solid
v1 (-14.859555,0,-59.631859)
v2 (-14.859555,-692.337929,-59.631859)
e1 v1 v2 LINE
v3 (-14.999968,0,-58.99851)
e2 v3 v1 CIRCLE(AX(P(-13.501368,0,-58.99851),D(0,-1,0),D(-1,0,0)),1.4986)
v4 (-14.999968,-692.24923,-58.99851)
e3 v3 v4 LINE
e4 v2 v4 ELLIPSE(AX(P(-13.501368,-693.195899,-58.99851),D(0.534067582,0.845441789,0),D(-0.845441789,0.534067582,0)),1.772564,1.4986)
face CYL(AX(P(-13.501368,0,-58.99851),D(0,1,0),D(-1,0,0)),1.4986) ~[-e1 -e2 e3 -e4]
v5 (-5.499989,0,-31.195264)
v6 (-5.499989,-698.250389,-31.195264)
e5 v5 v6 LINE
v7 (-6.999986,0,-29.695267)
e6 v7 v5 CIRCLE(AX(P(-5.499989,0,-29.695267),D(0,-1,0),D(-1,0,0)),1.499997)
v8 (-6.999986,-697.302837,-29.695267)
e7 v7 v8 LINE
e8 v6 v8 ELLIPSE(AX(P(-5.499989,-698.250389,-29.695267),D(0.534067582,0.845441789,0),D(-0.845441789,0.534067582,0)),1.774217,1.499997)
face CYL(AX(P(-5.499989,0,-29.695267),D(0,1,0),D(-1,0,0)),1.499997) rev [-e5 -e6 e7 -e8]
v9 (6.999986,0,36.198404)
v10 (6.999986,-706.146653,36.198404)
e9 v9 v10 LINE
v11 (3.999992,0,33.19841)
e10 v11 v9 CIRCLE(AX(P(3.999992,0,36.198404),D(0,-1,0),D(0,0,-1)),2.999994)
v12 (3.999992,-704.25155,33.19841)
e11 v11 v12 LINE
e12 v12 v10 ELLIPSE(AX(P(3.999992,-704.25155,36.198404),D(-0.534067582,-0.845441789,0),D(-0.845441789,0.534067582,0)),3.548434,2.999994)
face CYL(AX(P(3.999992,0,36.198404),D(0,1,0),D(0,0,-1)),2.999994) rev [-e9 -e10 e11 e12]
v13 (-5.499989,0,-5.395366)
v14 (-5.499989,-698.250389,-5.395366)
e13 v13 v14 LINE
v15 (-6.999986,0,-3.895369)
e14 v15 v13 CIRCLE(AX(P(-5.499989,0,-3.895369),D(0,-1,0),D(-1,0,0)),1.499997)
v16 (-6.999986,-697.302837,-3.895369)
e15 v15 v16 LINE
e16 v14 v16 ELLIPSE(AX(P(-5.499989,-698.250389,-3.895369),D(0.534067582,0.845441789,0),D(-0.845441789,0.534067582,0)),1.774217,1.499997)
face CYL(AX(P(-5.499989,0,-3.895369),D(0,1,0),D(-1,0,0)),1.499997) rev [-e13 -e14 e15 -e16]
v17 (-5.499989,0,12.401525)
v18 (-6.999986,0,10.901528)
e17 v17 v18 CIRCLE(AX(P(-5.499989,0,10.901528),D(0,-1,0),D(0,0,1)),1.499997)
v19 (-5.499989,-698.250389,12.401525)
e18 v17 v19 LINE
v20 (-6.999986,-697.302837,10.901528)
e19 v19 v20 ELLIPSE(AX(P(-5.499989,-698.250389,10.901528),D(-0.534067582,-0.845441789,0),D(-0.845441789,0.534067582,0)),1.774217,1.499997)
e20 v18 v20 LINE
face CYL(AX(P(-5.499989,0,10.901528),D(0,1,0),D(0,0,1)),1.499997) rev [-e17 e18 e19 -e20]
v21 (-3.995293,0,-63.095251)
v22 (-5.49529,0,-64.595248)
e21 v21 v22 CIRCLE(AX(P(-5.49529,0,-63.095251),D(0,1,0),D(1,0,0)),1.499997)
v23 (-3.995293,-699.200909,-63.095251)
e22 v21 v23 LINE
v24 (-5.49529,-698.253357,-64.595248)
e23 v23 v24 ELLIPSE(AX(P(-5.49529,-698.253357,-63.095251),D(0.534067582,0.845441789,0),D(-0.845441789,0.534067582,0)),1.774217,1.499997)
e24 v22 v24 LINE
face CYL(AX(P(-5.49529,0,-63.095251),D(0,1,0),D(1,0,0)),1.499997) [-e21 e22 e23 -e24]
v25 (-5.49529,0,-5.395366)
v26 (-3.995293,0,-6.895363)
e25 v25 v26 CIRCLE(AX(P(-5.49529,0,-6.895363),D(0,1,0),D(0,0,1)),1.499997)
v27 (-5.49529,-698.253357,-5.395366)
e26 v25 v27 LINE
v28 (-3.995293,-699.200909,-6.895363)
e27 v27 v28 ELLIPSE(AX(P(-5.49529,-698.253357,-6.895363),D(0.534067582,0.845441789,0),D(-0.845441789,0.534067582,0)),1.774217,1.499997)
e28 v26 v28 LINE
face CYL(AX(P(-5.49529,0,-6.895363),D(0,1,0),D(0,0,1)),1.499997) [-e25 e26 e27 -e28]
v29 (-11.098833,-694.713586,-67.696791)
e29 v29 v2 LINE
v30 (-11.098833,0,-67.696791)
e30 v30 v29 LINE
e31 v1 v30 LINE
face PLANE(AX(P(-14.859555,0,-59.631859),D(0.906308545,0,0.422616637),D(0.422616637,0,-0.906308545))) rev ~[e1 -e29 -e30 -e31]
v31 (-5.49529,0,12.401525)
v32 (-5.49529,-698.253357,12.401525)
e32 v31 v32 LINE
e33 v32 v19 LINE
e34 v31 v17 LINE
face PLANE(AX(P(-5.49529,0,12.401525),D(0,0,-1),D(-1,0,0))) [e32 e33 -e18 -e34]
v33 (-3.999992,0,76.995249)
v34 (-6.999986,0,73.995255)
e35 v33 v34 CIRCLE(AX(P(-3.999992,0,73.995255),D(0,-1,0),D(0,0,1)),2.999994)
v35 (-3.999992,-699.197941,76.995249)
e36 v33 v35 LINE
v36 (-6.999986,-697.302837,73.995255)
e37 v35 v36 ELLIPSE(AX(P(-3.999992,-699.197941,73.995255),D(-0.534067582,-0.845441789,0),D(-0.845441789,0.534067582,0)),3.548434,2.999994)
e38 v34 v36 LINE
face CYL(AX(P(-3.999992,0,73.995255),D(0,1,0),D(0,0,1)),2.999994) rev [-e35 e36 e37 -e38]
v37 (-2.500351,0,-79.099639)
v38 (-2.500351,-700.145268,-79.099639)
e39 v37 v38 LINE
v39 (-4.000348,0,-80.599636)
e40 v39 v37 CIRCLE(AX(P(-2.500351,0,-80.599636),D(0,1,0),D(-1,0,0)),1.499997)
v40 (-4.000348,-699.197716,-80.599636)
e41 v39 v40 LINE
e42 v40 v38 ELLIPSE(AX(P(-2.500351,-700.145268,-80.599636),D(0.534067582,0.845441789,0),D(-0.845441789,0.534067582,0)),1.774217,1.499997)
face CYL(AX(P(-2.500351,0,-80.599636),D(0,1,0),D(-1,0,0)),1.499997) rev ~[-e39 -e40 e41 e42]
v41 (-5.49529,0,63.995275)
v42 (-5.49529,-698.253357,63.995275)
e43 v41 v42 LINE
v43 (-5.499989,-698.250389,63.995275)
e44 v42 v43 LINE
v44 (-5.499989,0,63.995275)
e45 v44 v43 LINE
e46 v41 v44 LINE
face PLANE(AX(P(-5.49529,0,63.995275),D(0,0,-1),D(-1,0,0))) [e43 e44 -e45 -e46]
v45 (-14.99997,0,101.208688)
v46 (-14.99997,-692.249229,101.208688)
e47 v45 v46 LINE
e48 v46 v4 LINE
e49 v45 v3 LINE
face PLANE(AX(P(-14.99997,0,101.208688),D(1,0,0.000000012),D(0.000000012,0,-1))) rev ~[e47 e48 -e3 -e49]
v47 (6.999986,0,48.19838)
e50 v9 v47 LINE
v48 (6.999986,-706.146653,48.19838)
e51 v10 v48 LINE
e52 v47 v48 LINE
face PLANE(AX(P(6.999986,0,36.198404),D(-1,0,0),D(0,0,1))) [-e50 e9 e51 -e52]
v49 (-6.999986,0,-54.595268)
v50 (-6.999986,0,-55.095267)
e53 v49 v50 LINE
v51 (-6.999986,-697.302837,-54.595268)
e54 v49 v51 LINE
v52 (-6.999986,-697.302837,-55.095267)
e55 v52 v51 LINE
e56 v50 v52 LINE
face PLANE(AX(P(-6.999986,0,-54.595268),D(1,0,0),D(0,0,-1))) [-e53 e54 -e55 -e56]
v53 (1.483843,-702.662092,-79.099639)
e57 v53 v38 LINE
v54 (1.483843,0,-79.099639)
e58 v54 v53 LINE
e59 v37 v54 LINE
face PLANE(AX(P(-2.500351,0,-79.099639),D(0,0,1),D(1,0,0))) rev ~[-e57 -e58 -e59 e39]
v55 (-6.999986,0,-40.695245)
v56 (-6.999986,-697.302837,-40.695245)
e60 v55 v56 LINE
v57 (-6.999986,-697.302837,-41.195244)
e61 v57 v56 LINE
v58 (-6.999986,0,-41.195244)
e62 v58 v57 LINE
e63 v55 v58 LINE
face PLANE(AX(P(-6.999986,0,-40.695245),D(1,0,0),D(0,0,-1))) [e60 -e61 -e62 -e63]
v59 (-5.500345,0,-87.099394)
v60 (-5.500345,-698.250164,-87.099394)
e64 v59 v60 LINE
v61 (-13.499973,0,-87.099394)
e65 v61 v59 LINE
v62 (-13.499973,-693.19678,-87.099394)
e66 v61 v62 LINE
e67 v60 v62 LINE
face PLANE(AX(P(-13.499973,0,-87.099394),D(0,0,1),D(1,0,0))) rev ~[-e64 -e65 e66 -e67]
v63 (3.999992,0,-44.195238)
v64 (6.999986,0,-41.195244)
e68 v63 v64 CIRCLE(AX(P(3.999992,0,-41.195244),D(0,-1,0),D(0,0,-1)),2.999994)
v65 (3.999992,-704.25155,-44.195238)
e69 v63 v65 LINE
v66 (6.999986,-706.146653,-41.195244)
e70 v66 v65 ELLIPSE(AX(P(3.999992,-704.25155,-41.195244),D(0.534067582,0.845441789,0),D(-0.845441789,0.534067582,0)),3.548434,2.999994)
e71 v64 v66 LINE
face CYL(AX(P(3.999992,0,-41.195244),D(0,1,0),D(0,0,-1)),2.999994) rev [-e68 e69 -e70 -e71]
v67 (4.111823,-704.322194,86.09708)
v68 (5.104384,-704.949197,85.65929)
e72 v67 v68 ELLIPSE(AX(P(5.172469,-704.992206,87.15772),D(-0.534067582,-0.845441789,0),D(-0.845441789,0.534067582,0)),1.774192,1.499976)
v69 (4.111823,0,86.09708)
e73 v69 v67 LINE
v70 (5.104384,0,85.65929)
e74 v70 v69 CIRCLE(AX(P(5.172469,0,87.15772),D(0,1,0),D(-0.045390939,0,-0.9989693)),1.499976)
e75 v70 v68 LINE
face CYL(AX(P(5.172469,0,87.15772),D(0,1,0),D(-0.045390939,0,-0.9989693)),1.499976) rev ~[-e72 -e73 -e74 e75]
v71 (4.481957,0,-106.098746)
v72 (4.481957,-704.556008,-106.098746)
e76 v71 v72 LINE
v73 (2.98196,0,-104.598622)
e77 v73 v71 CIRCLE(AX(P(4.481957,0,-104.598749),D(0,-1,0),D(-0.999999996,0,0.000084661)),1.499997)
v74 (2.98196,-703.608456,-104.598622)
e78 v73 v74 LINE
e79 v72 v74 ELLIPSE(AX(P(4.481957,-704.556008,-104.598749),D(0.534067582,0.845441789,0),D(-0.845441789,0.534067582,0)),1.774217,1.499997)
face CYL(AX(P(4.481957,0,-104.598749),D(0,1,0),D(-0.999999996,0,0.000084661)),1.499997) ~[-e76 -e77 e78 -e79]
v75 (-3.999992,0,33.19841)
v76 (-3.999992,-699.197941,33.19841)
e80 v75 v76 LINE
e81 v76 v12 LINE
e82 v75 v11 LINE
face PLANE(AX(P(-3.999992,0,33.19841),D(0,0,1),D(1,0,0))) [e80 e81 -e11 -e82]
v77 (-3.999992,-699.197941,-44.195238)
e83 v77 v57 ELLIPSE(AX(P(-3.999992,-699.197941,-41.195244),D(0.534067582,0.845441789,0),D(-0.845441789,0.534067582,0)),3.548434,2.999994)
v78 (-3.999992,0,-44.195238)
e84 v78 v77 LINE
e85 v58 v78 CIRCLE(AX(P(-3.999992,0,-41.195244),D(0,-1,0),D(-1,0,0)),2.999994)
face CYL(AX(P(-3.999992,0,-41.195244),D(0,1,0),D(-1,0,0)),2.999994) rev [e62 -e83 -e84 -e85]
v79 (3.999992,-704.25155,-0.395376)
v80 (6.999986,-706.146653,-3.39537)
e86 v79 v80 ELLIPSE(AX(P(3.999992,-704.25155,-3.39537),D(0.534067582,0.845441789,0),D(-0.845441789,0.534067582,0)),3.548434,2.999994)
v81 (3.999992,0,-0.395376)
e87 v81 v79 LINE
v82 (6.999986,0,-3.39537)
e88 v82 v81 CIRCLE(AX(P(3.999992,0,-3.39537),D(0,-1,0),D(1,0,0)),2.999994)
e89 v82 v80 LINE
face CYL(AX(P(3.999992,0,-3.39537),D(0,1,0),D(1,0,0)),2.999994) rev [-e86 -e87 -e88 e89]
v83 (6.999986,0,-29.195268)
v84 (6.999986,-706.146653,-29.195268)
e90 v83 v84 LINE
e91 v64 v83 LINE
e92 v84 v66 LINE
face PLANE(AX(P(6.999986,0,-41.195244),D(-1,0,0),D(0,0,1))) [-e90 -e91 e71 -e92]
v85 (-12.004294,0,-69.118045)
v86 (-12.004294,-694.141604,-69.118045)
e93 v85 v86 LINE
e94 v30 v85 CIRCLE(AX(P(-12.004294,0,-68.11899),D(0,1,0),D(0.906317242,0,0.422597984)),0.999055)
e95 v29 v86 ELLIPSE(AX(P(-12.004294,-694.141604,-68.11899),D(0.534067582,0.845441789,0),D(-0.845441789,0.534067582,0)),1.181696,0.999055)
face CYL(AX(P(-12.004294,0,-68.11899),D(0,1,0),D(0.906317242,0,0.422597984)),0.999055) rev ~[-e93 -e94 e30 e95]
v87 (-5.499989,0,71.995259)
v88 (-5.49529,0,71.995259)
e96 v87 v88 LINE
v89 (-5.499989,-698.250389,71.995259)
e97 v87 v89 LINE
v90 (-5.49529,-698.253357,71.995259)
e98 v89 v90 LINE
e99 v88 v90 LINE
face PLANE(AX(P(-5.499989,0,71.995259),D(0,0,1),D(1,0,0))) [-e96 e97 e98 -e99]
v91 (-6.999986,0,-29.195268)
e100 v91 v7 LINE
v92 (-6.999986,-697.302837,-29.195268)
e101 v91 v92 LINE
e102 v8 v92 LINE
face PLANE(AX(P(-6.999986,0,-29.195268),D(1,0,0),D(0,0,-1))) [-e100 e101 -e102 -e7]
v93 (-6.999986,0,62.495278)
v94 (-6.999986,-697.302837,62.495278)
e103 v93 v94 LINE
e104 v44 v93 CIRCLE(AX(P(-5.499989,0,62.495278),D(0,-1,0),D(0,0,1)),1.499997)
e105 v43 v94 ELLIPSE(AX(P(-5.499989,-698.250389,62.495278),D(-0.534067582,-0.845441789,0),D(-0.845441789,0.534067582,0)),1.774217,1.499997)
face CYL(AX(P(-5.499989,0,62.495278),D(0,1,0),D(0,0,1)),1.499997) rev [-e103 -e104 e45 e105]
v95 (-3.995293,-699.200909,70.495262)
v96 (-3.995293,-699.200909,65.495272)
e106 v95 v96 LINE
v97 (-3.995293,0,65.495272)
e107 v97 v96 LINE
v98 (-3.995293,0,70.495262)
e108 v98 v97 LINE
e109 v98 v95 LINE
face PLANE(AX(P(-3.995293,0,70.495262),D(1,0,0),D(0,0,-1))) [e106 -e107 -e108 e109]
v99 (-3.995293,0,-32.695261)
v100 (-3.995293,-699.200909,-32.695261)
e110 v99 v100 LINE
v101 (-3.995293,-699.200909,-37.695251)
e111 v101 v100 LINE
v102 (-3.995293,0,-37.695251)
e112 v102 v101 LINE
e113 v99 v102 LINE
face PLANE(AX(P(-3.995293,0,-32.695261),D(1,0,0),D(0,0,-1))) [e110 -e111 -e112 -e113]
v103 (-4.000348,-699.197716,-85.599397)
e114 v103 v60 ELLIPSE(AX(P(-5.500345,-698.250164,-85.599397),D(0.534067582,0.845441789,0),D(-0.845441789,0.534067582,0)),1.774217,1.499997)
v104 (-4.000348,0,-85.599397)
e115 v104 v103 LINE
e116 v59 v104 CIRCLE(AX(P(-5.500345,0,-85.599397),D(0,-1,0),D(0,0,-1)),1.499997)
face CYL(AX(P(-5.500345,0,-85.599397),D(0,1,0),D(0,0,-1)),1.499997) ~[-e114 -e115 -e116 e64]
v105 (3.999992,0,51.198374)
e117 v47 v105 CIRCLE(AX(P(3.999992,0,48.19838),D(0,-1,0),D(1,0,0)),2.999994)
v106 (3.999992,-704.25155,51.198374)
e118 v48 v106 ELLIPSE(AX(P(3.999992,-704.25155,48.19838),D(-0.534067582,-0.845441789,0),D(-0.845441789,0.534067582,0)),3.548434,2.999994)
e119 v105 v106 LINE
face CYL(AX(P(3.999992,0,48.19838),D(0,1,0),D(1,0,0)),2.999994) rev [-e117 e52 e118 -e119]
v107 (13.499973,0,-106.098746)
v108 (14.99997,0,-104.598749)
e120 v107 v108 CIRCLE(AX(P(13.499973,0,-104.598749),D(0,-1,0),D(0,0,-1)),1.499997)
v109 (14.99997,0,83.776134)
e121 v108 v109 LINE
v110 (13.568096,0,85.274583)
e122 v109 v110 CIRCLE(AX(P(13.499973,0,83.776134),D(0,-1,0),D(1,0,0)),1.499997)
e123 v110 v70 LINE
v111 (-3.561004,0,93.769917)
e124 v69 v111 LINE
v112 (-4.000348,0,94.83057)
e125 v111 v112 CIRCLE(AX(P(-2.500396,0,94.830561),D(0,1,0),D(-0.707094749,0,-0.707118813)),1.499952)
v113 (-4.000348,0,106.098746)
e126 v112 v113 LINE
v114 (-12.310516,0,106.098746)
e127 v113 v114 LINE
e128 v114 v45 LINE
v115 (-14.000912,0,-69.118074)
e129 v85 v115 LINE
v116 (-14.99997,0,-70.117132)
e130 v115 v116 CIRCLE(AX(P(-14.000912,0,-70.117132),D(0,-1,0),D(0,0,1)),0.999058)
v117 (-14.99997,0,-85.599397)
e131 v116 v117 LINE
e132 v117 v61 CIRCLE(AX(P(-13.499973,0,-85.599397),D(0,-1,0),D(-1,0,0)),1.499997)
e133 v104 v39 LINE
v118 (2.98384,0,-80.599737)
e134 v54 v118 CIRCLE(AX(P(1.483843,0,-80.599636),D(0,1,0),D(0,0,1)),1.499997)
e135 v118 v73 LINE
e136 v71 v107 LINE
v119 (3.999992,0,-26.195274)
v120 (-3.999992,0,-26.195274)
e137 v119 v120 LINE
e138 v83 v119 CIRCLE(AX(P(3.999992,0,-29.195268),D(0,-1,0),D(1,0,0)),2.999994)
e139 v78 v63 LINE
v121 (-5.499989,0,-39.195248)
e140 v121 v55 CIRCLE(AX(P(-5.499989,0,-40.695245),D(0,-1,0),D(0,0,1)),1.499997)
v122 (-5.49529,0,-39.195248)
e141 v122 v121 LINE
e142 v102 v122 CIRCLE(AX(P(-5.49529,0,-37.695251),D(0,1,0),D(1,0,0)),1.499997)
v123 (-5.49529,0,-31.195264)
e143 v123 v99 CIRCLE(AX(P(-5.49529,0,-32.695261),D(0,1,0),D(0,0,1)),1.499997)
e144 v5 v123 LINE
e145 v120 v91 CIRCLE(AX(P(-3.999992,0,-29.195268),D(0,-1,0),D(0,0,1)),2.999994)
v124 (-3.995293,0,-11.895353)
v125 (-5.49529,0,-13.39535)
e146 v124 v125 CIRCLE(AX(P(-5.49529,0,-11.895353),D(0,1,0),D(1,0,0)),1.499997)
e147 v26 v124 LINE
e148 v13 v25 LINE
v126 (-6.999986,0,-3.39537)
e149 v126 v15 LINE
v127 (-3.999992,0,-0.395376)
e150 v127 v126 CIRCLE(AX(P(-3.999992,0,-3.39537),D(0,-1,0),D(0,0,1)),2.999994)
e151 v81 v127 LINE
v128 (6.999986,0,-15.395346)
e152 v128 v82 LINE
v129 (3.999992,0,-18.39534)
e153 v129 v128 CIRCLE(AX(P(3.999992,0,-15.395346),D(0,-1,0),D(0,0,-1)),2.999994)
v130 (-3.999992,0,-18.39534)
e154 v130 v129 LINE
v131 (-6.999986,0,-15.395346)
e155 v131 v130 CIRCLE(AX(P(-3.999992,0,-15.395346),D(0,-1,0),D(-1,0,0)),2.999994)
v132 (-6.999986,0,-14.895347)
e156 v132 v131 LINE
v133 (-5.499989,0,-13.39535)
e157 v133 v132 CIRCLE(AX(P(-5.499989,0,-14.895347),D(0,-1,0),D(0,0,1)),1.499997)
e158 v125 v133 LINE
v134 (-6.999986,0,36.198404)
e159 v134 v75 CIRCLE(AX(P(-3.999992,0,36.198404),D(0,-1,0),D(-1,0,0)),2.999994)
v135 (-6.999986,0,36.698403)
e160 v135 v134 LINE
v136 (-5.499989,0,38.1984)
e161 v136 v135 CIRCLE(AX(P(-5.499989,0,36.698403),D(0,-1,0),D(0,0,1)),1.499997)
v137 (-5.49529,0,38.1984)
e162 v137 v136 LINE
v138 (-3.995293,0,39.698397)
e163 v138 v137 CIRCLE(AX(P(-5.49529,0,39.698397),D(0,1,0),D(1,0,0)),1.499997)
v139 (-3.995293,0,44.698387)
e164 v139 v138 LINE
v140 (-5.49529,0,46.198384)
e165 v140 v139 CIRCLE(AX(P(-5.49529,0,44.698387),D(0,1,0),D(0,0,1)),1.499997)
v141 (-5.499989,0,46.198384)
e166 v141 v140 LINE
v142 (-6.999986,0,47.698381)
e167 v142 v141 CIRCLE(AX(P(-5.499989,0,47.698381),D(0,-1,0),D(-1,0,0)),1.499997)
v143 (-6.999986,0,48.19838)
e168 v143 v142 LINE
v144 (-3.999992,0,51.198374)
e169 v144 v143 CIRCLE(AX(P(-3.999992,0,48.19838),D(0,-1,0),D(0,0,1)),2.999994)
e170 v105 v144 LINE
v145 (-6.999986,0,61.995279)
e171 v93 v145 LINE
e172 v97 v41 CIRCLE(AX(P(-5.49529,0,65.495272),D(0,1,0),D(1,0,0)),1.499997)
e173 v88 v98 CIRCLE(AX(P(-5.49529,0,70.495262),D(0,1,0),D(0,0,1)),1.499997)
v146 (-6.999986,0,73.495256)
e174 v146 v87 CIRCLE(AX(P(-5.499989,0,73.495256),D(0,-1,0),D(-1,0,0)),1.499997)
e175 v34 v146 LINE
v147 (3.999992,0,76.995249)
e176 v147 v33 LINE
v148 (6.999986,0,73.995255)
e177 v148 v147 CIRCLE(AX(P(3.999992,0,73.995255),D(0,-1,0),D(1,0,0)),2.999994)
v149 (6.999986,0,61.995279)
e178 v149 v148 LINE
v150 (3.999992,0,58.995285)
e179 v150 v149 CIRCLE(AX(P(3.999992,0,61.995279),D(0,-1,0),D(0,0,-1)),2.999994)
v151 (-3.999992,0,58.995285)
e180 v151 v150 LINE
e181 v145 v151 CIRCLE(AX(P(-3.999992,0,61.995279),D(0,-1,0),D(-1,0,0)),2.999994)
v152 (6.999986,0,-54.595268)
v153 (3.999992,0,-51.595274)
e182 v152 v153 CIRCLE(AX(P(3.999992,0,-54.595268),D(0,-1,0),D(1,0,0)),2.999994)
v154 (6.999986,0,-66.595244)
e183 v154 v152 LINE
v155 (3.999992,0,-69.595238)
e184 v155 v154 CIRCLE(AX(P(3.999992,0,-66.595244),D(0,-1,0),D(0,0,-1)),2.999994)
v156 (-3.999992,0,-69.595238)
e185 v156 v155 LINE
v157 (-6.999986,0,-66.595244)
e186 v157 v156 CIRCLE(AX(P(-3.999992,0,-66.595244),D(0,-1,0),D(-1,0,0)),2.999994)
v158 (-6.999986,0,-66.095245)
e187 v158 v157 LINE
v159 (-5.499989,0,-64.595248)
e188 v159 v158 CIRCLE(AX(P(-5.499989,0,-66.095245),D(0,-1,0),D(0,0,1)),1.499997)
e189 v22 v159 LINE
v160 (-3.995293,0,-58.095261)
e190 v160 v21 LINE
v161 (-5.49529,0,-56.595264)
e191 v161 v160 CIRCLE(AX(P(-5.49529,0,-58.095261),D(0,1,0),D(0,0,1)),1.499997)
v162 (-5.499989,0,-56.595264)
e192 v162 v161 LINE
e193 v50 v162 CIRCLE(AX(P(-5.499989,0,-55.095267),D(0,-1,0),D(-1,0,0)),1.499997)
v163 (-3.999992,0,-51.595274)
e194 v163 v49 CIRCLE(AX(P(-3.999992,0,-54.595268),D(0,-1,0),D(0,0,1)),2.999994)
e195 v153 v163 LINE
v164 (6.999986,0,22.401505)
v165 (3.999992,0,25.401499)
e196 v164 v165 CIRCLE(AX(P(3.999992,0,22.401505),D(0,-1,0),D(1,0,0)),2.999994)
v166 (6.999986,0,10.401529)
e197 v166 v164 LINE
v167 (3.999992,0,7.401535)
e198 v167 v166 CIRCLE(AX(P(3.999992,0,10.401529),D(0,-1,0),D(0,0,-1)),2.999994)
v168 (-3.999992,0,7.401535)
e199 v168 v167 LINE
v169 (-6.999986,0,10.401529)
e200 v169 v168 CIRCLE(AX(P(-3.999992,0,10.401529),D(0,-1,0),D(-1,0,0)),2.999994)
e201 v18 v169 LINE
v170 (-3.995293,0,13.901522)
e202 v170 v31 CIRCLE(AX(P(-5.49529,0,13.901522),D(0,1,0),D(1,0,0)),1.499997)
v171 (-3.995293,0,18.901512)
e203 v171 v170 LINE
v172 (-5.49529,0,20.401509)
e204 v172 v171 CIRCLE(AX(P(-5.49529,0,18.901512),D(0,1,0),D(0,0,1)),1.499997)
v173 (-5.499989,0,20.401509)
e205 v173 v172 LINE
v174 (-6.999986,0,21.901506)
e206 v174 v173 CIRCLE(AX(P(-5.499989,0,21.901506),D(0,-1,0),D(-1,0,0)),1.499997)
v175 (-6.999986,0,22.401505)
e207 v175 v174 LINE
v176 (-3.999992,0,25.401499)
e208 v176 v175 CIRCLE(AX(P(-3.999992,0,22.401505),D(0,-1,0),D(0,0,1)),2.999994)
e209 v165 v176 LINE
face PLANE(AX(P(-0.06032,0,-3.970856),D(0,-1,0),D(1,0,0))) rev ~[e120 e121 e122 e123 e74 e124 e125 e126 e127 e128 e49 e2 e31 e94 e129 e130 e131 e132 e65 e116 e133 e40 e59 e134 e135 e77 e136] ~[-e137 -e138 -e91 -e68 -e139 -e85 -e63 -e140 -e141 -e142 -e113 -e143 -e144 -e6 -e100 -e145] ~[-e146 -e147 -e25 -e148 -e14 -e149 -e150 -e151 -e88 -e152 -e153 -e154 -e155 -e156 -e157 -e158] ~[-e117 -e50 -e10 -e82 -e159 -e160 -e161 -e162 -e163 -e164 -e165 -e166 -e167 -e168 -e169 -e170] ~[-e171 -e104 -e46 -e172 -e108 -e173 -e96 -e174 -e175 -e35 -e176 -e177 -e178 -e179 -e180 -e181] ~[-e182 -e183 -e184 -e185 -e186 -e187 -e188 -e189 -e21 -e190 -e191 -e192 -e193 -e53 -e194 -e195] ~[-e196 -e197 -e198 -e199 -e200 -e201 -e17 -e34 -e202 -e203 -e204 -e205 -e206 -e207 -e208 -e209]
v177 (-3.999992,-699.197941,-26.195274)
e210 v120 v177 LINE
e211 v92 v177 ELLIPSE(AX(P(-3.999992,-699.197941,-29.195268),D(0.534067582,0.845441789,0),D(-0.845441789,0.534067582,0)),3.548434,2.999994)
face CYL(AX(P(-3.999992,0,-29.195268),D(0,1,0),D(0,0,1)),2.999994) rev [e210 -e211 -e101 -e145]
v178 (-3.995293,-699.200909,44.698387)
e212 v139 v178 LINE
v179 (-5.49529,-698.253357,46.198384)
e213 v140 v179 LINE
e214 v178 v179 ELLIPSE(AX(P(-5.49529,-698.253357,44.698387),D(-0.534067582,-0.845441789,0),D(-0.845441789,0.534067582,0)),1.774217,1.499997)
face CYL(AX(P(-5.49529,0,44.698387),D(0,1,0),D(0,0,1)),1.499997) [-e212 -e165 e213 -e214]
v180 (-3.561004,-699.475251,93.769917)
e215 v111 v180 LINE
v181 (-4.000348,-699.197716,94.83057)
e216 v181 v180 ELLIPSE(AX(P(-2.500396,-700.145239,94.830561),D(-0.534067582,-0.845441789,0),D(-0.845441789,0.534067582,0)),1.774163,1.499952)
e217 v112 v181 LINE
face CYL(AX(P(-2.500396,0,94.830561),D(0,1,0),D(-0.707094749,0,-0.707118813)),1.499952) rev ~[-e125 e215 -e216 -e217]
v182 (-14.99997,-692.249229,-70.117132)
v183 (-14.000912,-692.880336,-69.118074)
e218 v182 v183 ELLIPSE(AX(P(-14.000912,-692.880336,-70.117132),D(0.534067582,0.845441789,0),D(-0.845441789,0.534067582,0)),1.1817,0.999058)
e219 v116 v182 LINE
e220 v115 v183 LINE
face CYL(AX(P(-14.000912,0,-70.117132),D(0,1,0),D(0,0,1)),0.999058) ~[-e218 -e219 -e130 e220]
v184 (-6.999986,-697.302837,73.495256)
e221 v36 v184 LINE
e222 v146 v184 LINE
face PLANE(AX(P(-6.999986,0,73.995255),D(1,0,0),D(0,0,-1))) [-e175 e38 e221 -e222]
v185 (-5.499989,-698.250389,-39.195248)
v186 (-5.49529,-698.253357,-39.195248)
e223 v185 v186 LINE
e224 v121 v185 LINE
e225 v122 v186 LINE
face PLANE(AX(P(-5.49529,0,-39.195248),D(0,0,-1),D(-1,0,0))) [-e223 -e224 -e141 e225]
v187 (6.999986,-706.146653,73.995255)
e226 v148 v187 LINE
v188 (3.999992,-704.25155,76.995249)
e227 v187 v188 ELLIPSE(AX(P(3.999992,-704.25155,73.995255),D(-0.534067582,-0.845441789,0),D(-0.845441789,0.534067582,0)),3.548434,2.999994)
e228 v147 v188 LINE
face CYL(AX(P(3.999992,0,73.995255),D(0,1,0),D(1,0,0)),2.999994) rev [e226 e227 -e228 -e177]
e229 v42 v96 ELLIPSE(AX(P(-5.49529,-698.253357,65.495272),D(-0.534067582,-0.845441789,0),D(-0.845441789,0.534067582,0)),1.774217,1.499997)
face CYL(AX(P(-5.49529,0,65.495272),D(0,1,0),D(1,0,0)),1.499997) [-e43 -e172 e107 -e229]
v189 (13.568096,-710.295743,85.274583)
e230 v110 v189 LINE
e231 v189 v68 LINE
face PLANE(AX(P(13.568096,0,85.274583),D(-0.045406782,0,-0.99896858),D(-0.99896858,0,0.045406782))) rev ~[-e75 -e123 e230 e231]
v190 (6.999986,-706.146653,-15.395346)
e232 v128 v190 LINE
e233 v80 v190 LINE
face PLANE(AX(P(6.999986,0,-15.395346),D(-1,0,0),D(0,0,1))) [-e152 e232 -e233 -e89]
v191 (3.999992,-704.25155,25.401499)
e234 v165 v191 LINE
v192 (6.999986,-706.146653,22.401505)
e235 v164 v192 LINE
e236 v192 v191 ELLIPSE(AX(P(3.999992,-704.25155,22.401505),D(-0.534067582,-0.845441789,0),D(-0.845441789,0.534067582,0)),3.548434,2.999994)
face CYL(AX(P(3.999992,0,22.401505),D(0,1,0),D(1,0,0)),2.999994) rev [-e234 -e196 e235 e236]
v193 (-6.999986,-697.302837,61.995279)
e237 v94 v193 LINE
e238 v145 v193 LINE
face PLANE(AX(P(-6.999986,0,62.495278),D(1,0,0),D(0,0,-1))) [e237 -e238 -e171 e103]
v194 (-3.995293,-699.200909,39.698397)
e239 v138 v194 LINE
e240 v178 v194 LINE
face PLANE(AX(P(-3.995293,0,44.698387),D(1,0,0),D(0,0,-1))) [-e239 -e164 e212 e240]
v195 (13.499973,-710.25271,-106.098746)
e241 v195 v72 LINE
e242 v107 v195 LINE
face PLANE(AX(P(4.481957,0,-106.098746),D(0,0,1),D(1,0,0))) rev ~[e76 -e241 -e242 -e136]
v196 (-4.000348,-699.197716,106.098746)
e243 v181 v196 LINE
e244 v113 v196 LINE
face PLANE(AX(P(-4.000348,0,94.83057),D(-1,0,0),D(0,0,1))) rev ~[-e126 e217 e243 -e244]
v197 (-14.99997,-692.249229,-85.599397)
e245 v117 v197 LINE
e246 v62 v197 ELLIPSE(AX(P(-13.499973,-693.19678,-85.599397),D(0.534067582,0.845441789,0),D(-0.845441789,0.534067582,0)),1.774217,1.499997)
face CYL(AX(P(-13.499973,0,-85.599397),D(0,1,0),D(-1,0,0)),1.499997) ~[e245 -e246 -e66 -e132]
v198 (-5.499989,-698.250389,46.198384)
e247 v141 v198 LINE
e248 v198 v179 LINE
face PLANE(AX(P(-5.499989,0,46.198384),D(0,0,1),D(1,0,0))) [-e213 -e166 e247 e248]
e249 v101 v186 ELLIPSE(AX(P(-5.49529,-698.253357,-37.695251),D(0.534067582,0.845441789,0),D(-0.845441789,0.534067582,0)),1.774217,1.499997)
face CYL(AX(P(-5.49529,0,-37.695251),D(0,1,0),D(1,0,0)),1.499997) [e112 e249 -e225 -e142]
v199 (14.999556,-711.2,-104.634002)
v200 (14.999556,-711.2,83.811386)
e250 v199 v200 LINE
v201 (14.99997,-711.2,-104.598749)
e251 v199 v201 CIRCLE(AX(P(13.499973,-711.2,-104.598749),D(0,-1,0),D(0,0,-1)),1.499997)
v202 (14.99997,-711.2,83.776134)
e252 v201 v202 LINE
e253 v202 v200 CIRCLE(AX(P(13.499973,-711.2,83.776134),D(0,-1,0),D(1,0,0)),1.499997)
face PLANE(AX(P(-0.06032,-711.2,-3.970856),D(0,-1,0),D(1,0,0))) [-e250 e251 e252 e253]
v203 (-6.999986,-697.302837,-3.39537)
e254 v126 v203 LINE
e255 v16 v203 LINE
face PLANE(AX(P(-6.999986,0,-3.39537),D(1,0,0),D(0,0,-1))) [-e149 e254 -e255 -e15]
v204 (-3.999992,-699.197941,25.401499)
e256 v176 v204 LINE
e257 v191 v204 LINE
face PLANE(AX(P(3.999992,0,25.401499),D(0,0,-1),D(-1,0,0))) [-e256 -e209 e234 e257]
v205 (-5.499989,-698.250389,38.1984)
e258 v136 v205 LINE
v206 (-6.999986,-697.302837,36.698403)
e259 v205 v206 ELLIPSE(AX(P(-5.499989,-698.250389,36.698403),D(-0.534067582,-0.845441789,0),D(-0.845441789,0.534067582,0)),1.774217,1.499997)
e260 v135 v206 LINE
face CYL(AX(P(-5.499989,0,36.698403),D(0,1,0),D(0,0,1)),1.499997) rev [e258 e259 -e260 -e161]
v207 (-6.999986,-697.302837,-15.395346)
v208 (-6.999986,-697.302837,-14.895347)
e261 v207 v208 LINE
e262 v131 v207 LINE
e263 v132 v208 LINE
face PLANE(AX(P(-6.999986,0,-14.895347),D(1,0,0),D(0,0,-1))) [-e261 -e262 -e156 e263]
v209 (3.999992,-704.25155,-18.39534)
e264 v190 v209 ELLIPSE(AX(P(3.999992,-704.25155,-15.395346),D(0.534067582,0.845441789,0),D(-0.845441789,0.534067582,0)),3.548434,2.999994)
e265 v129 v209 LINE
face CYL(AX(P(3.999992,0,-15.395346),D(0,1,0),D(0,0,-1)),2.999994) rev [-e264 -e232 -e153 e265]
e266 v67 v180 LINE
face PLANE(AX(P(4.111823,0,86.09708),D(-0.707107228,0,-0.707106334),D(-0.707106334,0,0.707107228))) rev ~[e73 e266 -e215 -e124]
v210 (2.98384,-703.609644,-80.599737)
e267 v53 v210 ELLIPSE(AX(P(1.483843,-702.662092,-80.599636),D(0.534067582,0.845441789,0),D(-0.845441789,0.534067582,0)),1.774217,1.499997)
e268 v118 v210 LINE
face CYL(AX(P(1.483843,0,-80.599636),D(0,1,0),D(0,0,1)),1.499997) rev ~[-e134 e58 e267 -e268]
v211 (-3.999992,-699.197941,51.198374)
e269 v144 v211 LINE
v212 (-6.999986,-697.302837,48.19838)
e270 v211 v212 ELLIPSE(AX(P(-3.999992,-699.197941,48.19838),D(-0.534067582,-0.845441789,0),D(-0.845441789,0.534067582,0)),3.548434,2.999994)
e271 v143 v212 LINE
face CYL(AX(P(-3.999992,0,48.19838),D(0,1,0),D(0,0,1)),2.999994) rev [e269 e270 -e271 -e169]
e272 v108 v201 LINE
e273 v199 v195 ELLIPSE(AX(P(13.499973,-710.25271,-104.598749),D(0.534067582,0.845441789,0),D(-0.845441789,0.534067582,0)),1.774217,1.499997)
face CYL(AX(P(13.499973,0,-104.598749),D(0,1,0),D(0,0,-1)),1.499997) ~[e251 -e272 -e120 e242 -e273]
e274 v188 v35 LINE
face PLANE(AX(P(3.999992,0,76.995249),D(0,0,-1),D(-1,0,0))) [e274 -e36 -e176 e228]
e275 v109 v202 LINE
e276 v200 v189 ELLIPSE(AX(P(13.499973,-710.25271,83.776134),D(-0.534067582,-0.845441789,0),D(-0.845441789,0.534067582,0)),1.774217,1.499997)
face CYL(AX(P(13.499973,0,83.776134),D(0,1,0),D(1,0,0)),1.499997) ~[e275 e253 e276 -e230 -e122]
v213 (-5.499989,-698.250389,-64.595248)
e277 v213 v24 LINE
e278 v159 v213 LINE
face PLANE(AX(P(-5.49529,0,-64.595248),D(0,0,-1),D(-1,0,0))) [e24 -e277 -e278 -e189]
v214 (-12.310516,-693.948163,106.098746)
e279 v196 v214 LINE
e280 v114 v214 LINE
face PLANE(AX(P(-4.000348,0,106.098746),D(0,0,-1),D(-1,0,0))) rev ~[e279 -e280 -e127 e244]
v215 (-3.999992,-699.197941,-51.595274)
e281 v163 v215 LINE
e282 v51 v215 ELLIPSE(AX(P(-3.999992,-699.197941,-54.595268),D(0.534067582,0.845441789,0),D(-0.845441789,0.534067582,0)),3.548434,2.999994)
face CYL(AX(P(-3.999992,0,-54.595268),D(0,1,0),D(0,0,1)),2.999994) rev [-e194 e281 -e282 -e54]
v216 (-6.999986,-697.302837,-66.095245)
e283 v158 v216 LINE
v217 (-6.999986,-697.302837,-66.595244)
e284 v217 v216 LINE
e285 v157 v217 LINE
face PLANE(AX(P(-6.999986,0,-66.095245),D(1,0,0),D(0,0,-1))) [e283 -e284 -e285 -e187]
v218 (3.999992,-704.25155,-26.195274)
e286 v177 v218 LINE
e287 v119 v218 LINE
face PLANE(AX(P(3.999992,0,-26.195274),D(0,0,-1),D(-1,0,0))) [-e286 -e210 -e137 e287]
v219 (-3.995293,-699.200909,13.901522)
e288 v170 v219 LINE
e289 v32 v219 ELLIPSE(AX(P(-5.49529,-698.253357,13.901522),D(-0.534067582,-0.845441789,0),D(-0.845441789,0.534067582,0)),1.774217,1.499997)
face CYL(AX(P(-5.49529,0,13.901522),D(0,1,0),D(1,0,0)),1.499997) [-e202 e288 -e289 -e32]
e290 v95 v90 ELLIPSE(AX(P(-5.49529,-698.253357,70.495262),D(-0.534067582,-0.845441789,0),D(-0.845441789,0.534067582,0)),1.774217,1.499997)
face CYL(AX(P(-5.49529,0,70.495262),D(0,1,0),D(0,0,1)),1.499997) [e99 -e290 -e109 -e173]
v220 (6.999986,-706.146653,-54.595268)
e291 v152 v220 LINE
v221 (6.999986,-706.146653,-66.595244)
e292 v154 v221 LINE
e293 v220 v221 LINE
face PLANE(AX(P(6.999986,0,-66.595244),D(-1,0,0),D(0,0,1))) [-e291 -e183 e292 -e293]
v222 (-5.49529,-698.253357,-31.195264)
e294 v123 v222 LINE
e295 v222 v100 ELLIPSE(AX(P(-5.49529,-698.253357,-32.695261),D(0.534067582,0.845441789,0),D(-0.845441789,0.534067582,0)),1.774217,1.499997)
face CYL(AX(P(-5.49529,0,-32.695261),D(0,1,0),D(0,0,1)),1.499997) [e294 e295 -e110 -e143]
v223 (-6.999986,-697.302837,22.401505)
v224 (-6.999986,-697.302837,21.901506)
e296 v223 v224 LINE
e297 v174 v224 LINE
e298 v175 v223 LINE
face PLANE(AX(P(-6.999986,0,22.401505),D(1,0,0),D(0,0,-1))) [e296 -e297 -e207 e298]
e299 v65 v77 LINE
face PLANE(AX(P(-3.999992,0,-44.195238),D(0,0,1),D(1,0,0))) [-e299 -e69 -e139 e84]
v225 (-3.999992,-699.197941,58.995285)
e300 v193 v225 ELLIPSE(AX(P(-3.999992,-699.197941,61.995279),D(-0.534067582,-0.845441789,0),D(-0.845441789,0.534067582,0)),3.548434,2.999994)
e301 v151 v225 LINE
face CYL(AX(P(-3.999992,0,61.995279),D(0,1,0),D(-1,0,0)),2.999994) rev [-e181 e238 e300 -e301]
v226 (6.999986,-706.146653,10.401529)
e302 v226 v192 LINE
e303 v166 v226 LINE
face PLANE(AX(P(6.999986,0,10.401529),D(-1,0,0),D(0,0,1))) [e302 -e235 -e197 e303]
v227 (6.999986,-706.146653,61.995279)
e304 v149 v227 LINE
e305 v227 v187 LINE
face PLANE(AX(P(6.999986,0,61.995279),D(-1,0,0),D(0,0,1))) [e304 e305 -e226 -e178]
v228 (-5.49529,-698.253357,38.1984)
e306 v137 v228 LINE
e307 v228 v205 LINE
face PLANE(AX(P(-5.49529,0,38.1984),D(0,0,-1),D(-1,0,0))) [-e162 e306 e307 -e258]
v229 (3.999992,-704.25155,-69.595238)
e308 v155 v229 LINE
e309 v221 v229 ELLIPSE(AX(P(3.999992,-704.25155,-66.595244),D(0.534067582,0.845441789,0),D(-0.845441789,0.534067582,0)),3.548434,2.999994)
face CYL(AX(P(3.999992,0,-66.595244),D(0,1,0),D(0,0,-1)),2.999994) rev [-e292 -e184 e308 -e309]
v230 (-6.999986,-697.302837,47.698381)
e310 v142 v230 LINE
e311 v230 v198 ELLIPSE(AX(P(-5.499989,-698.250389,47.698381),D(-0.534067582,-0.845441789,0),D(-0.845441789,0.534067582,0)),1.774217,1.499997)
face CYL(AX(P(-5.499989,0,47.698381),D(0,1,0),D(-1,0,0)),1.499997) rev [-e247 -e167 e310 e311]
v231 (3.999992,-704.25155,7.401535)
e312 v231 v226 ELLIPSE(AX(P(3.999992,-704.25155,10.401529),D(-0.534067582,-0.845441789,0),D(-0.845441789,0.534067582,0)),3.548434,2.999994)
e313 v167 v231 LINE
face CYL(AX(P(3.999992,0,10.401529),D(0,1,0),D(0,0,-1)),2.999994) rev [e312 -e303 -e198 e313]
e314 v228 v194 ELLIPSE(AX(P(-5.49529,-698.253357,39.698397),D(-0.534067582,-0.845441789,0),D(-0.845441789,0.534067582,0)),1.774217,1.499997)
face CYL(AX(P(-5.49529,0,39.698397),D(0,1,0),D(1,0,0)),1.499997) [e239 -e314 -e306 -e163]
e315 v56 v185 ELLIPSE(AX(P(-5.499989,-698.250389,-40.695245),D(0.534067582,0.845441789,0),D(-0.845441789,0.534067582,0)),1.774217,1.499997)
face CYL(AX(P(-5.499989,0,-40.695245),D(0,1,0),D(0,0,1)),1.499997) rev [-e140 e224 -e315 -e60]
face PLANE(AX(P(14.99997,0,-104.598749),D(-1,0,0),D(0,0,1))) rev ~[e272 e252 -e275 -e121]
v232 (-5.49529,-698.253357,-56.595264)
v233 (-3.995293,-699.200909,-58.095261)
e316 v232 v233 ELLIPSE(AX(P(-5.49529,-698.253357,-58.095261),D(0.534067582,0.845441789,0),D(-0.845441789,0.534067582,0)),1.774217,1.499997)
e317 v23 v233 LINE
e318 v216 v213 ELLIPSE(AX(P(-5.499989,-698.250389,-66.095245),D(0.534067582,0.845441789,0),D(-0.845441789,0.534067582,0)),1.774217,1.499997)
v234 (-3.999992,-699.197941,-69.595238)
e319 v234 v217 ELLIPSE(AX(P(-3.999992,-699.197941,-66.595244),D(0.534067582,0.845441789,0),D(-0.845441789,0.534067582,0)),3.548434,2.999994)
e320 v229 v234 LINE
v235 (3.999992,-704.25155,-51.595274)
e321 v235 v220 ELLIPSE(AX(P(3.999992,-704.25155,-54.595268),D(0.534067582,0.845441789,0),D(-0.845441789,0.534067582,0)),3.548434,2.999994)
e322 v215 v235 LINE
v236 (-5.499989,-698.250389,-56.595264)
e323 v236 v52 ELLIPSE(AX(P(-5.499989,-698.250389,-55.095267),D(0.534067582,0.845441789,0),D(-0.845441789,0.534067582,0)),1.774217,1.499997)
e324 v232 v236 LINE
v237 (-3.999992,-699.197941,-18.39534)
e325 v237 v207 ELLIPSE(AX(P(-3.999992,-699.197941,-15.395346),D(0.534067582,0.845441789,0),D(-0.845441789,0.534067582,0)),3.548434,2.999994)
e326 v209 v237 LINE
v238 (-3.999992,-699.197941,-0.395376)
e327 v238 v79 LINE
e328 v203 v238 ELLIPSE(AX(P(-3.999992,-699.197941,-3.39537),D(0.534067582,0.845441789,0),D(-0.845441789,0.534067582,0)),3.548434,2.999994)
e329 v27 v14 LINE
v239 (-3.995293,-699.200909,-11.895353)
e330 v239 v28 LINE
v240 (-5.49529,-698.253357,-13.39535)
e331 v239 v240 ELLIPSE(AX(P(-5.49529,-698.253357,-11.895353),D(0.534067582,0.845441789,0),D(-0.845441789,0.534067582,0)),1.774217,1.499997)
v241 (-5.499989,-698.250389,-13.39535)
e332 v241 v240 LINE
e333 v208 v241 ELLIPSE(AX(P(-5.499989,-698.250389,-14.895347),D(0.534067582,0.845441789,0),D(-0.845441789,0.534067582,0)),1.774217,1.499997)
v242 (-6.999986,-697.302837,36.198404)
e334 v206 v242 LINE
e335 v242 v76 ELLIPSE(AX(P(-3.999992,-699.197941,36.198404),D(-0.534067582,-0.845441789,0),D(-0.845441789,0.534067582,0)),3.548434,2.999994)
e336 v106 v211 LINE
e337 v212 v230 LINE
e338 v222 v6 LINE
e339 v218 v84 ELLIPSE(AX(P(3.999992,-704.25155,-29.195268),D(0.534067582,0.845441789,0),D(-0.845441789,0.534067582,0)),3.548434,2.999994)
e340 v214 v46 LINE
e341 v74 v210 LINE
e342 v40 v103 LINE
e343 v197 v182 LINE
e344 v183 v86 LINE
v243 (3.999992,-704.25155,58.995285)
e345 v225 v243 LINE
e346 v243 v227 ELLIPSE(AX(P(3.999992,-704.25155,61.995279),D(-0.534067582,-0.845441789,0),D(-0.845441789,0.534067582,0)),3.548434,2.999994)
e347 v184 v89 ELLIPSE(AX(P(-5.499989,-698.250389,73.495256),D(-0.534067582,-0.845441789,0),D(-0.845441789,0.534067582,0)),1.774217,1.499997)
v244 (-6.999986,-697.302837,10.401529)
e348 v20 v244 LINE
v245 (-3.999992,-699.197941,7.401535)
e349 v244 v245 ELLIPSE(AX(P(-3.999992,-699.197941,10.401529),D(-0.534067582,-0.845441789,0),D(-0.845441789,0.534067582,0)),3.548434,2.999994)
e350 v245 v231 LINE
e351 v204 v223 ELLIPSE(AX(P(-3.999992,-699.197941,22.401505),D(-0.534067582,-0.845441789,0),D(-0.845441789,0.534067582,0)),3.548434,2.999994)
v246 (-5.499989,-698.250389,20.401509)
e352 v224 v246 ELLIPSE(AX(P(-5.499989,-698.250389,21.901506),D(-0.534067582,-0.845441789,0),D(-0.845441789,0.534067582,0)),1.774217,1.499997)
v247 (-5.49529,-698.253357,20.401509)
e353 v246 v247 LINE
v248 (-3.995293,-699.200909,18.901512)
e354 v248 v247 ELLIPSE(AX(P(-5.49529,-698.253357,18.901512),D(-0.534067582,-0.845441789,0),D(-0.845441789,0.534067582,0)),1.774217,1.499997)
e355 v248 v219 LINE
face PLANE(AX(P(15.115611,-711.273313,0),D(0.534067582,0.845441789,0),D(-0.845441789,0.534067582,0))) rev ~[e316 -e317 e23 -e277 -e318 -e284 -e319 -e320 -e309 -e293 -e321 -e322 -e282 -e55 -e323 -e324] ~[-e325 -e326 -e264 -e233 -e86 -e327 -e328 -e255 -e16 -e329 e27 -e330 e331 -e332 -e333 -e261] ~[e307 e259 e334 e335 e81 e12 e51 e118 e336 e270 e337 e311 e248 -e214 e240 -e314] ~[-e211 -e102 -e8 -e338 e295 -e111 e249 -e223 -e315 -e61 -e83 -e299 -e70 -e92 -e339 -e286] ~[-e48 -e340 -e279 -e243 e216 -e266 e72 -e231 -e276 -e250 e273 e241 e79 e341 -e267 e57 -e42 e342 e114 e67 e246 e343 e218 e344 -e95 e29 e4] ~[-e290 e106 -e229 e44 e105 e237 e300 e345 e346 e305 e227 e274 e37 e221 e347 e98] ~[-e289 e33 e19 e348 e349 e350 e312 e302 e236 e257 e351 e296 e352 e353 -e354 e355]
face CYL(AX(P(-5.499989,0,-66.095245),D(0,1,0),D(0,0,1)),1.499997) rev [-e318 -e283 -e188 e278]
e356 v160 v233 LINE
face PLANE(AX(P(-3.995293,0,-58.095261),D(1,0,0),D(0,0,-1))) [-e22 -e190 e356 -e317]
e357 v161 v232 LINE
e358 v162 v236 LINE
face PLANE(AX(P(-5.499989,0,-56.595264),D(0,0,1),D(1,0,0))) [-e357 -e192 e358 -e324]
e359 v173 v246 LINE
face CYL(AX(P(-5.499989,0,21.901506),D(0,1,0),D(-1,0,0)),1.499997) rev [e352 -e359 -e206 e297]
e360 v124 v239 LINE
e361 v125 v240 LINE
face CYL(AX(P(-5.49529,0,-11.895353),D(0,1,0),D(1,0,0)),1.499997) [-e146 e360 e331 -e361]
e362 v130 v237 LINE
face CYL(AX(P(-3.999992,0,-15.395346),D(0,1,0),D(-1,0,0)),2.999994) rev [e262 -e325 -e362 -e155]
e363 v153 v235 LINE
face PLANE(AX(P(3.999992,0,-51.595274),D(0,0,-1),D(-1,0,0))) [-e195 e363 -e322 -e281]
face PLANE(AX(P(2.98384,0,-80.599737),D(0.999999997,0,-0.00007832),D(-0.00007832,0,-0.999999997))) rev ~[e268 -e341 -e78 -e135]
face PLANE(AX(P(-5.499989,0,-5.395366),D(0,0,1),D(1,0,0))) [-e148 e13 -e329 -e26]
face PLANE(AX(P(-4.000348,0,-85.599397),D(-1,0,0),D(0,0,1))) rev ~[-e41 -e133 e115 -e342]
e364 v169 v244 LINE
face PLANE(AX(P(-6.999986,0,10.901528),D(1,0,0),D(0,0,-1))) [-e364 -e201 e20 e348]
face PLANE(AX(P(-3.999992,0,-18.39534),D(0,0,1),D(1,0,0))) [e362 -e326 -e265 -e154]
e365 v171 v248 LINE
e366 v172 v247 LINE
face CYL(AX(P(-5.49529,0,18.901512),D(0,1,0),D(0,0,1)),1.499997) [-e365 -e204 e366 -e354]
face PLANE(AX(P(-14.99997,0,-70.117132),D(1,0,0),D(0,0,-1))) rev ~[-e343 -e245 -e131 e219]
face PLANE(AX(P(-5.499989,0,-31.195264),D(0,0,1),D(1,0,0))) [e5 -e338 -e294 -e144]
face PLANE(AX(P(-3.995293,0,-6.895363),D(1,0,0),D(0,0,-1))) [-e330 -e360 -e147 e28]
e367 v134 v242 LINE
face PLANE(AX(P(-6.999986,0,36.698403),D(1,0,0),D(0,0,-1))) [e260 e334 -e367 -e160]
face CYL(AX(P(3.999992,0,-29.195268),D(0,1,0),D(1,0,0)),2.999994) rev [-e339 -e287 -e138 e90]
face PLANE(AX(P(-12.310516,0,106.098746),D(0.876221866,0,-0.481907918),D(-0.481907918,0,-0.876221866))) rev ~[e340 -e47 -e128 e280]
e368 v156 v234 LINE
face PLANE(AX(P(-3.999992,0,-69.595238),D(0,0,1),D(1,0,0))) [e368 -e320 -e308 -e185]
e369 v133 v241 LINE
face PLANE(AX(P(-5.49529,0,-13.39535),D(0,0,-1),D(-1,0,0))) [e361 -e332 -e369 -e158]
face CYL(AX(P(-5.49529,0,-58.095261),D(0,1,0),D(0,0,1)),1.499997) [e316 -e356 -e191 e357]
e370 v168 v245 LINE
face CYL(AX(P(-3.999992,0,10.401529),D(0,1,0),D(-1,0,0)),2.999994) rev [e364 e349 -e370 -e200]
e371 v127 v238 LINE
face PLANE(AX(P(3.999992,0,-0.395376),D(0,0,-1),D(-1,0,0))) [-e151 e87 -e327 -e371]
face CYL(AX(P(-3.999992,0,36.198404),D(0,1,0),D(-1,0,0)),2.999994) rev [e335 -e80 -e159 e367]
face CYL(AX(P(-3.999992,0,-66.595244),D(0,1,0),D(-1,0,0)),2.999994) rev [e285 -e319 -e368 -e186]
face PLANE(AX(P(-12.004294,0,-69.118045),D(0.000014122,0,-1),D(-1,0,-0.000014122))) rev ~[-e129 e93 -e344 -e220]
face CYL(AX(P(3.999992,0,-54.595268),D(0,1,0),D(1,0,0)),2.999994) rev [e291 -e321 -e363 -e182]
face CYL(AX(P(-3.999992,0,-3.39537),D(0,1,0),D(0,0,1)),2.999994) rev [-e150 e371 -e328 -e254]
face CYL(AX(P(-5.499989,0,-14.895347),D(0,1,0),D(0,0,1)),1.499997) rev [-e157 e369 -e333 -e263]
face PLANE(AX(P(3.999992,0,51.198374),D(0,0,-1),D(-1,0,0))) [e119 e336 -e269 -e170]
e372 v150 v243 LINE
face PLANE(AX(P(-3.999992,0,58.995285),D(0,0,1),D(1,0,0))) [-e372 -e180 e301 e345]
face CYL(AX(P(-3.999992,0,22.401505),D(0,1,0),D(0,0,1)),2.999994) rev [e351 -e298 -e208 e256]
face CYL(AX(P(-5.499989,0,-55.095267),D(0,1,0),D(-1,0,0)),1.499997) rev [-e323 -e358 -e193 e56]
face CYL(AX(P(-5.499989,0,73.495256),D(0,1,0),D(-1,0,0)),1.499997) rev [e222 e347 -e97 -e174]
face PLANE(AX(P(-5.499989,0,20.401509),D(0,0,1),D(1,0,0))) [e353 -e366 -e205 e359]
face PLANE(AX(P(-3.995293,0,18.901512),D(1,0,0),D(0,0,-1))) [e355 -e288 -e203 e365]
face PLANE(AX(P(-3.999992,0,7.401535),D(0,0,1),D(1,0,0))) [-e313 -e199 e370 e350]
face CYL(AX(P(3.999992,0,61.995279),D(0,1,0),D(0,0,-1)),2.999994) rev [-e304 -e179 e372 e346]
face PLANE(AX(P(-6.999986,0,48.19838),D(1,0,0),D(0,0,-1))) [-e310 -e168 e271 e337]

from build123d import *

# Parameters (mm, degrees)
F1_DEPTH      = 711.2
F3_DEPTH      = 711.2
F5_DEPTH      = 106.0997464
F5_DEPTH_BACK = 106.0997464


# Not quite as in the source:
# - ends of sketch curves that miss each other by under 0.0002 mm in the source are joined


with BuildPart() as f1:
    # F0 (on Front) → F1 (new body)
    with BuildSketch(Plane.XZ):
        with BuildLine():
            ThreePointArc((-14.9999680608, -58.9985104), (-14.96444377, -59.322873513), (-14.8595551032, -59.6318585804))
            Line((-14.8595551032, -59.6318585804), (-11.0988328608, -67.6967912))
            ThreePointArc((-11.0988328608, -67.6967912), (-11.1617050028, -68.655791158), (-12.004294, -69.1180454046))
            Line((-12.004294, -69.1180454046), (-14.0009118, -69.1180736))
            ThreePointArc((-14.0009118, -69.1180736), (-14.707352628, -69.410690972), (-14.99997, -70.1171318))
            Line((-14.99997, -70.1171318), (-14.99997, -85.599397))
            ThreePointArc((-14.99997, -85.599397), (-14.5606310505, -86.6600550505), (-13.499973, -87.099394))
            Line((-13.499973, -87.099394), (-5.5003446, -87.099394))
            ThreePointArc((-5.5003446, -87.099394), (-4.4396865495, -86.6600550505), (-4.0003476, -85.599397))
            Line((-4.0003476, -85.599397), (-4.0003476, -80.5996356))
            ThreePointArc((-4.0003476, -80.5996356), (-3.5610086505, -79.5389775495), (-2.5003506, -79.0996386))
            Line((-2.5003506, -79.0996386), (1.4838426, -79.0996386))
            ThreePointArc((1.4838426, -79.0996386), (2.5445365709, -79.5390134712), (2.9838395966, -80.5997372))
            Line((2.9838395966, -80.5997372), (2.98196, -104.5986224))
            ThreePointArc((2.98196, -104.5986224), (3.4212540492, -105.6593625482), (4.481957, -106.0987464))
            Line((4.481957, -106.0987464), (13.499973, -106.0987464))
            ThreePointArc((13.499973, -106.0987464), (14.5606310505, -105.6594074505), (14.99997, -104.5987494))
            Line((14.99997, -104.5987494), (14.99997, 83.7761342))
            ThreePointArc((14.99997, 83.7761342), (14.5844487053, 84.8124273268), (13.5680958768, 85.2745834897))
            Line((13.5680958768, 85.2745834897), (5.104384, 85.6592902))
            ThreePointArc((5.104384, 85.6592902), (4.5671403109, 85.7853117853), (4.1118233495, 86.0970797495))
            Line((4.1118233495, 86.0970797495), (-3.5610038, 93.7699166))
            ThreePointArc((-3.5610038, 93.7699166), (-3.8861671271, 94.2565457995), (-4.0003476, 94.8305698))
            Line((-4.0003476, 94.8305698), (-4.0003476, 106.0987464))
            Line((-4.0003476, 106.0987464), (-12.3105164, 106.0987464))
            Line((-12.3105164, 106.0987464), (-14.99997, 101.2086876))
            Line((-14.99997, 101.2086876), (-14.9999680608, -58.9985104))
        make_face()
    extrude(amount=F1_DEPTH)

    # F2 (on Front) → F3 (cut)
    with BuildSketch(Plane.XZ):
        with BuildLine():
            ThreePointArc((-5.49529, -31.195264), (-4.4346319495, -31.6346029495), (-3.995293, -32.695261))
            Line((-3.995293, -32.695261), (-3.995293, -37.695251))
            ThreePointArc((-3.995293, -37.695251), (-4.4346319495, -38.7559090505), (-5.49529, -39.195248))
            Line((-5.49529, -39.195248), (-5.499989, -39.195248))
            ThreePointArc((-5.499989, -39.195248), (-6.5606470505, -39.6345869495), (-6.999986, -40.695245))
            Line((-6.999986, -40.695245), (-6.999986, -41.195244))
            ThreePointArc((-6.999986, -41.195244), (-6.1213081009, -43.3165601009), (-3.999992, -44.195238))
            Line((-3.999992, -44.195238), (3.999992, -44.195238))
            ThreePointArc((3.999992, -44.195238), (6.1213081009, -43.3165601009), (6.999986, -41.195244))
            Line((6.999986, -41.195244), (6.999986, -29.195268))
            ThreePointArc((6.999986, -29.195268), (6.1213081009, -27.0739518991), (3.999992, -26.195274))
            Line((3.999992, -26.195274), (-3.999992, -26.195274))
            ThreePointArc((-3.999992, -26.195274), (-6.1213081009, -27.0739518991), (-6.999986, -29.195268))
            Line((-6.999986, -29.195268), (-6.999986, -29.695267))
            ThreePointArc((-6.999986, -29.695267), (-6.5606470505, -30.7559250505), (-5.499989, -31.195264))
            Line((-5.499989, -31.195264), (-5.49529, -31.195264))
        make_face()
        with BuildLine():
            ThreePointArc((-5.49529, -56.595264), (-4.4346319495, -57.0346029495), (-3.995293, -58.095261))
            Line((-3.995293, -58.095261), (-3.995293, -63.095251))
            ThreePointArc((-3.995293, -63.095251), (-4.4346319495, -64.1559090505), (-5.49529, -64.595248))
            Line((-5.49529, -64.595248), (-5.499989, -64.595248))
            ThreePointArc((-5.499989, -64.595248), (-6.5606470505, -65.0345869495), (-6.999986, -66.095245))
            Line((-6.999986, -66.095245), (-6.999986, -66.595244))
            ThreePointArc((-6.999986, -66.595244), (-6.1213081009, -68.7165601009), (-3.999992, -69.595238))
            Line((-3.999992, -69.595238), (0, -69.595238))
            Line((0, -69.595238), (3.999992, -69.595238))
            ThreePointArc((3.999992, -69.595238), (6.1213081009, -68.7165601009), (6.999986, -66.595244))
            Line((6.999986, -66.595244), (6.999986, -54.595268))
            ThreePointArc((6.999986, -54.595268), (6.1213081009, -52.4739518991), (3.999992, -51.595274))
            Line((3.999992, -51.595274), (-3.999992, -51.595274))
            ThreePointArc((-3.999992, -51.595274), (-6.1213081009, -52.4739518991), (-6.999986, -54.595268))
            Line((-6.999986, -54.595268), (-6.999986, -55.095267))
            ThreePointArc((-6.999986, -55.095267), (-6.5606470505, -56.1559250505), (-5.499989, -56.595264))
            Line((-5.499989, -56.595264), (-5.49529, -56.595264))
        make_face()
        with BuildLine():
            ThreePointArc((-5.49529, -5.3953664), (-4.4346319495, -5.8347053495), (-3.995293, -6.8953634))
            Line((-3.995293, -6.8953634), (-3.995293, -11.8953534))
            ThreePointArc((-3.995293, -11.8953534), (-4.4346319495, -12.9560114505), (-5.49529, -13.3953504))
            Line((-5.49529, -13.3953504), (-5.499989, -13.3953504))
            ThreePointArc((-5.499989, -13.3953504), (-6.5606470505, -13.8346893495), (-6.999986, -14.8953474))
            Line((-6.999986, -14.8953474), (-6.999986, -15.3953464))
            ThreePointArc((-6.999986, -15.3953464), (-6.1213081009, -17.5166625009), (-3.999992, -18.3953404))
            Line((-3.999992, -18.3953404), (3.999992, -18.3953404))
            ThreePointArc((3.999992, -18.3953404), (6.1213081009, -17.5166625009), (6.999986, -15.3953464))
            Line((6.999986, -15.3953464), (6.999986, -3.3953704))
            ThreePointArc((6.999986, -3.3953704), (6.1213081009, -1.2740542991), (3.999992, -0.3953764))
            Line((3.999992, -0.3953764), (-3.999992, -0.3953764))
            ThreePointArc((-3.999992, -0.3953764), (-6.1213081009, -1.2740542991), (-6.999986, -3.3953704))
            Line((-6.999986, -3.3953704), (-6.999986, -3.8953694))
            ThreePointArc((-6.999986, -3.8953694), (-6.5606470505, -4.9560274505), (-5.499989, -5.3953664))
            Line((-5.499989, -5.3953664), (-5.49529, -5.3953664))
        make_face()
        with BuildLine():
            Line((-5.499989, 20.4015086), (-5.49529, 20.4015086))
            ThreePointArc((-5.49529, 20.4015086), (-4.4346319495, 19.9621696505), (-3.995293, 18.9015116))
            Line((-3.995293, 18.9015116), (-3.995293, 13.9015216))
            ThreePointArc((-3.995293, 13.9015216), (-4.4346319495, 12.8408635495), (-5.49529, 12.4015246))
            Line((-5.49529, 12.4015246), (-5.499989, 12.4015246))
            ThreePointArc((-5.499989, 12.4015246), (-6.5606470505, 11.9621856505), (-6.999986, 10.9015276))
            Line((-6.999986, 10.9015276), (-6.999986, 10.4015286))
            ThreePointArc((-6.999986, 10.4015286), (-6.1213081009, 8.2802124991), (-3.999992, 7.4015346))
            Line((-3.999992, 7.4015346), (3.999992, 7.4015346))
            ThreePointArc((3.999992, 7.4015346), (6.1213081009, 8.2802124991), (6.999986, 10.4015286))
            Line((6.999986, 10.4015286), (6.999986, 22.4015046))
            ThreePointArc((6.999986, 22.4015046), (6.1213081009, 24.5228207009), (3.999992, 25.4014986))
            Line((3.999992, 25.4014986), (-3.999992, 25.4014986))
            ThreePointArc((-3.999992, 25.4014986), (-6.1213081009, 24.5228207009), (-6.999986, 22.4015046))
            Line((-6.999986, 22.4015046), (-6.999986, 21.9015056))
            ThreePointArc((-6.999986, 21.9015056), (-6.5606470505, 20.8408475495), (-5.499989, 20.4015086))
        make_face()
        with BuildLine():
            Line((-5.499989, 46.1983836), (-5.49529, 46.1983836))
            ThreePointArc((-5.49529, 46.1983836), (-4.4346319495, 45.7590446505), (-3.995293, 44.6983866))
            Line((-3.995293, 44.6983866), (-3.995293, 39.6983966))
            ThreePointArc((-3.995293, 39.6983966), (-4.4346319495, 38.6377385495), (-5.49529, 38.1983996))
            Line((-5.49529, 38.1983996), (-5.499989, 38.1983996))
            ThreePointArc((-5.499989, 38.1983996), (-6.5606470505, 37.7590606505), (-6.999986, 36.6984026))
            Line((-6.999986, 36.6984026), (-6.999986, 36.1984036))
            ThreePointArc((-6.999986, 36.1984036), (-6.1213081009, 34.0770874991), (-3.999992, 33.1984096))
            Line((-3.999992, 33.1984096), (3.999992, 33.1984096))
            ThreePointArc((3.999992, 33.1984096), (6.1213081009, 34.0770874991), (6.999986, 36.1984036))
            Line((6.999986, 36.1984036), (6.999986, 48.1983796))
            ThreePointArc((6.999986, 48.1983796), (6.1213081009, 50.3196957009), (3.999992, 51.1983736))
            Line((3.999992, 51.1983736), (-3.999992, 51.1983736))
            ThreePointArc((-3.999992, 51.1983736), (-6.1213081009, 50.3196957009), (-6.999986, 48.1983796))
            Line((-6.999986, 48.1983796), (-6.999986, 47.6983806))
            ThreePointArc((-6.999986, 47.6983806), (-6.5606470505, 46.6377225495), (-5.499989, 46.1983836))
        make_face()
        with BuildLine():
            Line((-5.499989, 71.9952586), (-5.49529, 71.9952586))
            ThreePointArc((-5.49529, 71.9952586), (-4.4346319495, 71.5559196505), (-3.995293, 70.4952616))
            Line((-3.995293, 70.4952616), (-3.995293, 65.4952716))
            ThreePointArc((-3.995293, 65.4952716), (-4.4346319495, 64.4346135495), (-5.49529, 63.9952746))
            Line((-5.49529, 63.9952746), (-5.499989, 63.9952746))
            ThreePointArc((-5.499989, 63.9952746), (-6.5606470505, 63.5559356505), (-6.999986, 62.4952776))
            Line((-6.999986, 62.4952776), (-6.999986, 61.9952786))
            ThreePointArc((-6.999986, 61.9952786), (-6.1213081009, 59.8739624991), (-3.999992, 58.9952846))
            Line((-3.999992, 58.9952846), (3.999992, 58.9952846))
            ThreePointArc((3.999992, 58.9952846), (6.1213081009, 59.8739624991), (6.999986, 61.9952786))
            Line((6.999986, 61.9952786), (6.999986, 73.9952546))
            ThreePointArc((6.999986, 73.9952546), (6.1213081009, 76.1165707009), (3.999992, 76.9952486))
            Line((3.999992, 76.9952486), (-3.999992, 76.9952486))
            ThreePointArc((-3.999992, 76.9952486), (-6.1213081009, 76.1165707009), (-6.999986, 73.9952546))
            Line((-6.999986, 73.9952546), (-6.999986, 73.4952556))
            ThreePointArc((-6.999986, 73.4952556), (-6.5606470505, 72.4345975495), (-5.499989, 71.9952586))
        make_face()
    extrude(amount=F3_DEPTH, mode=Mode.SUBTRACT)

    # F4 (on Top) → F5 (cut, two sides)
    with BuildSketch(Plane.XY) as f5_sk:
        Polygon((-15.0409955531, -711.2733125687), (15.1156112552, -711.2733125687), (-15.0409955531, -692.2233125687), align=None)
    extrude(amount=F5_DEPTH, mode=Mode.SUBTRACT)
    extrude(f5_sk.sketch, amount=-F5_DEPTH_BACK, mode=Mode.SUBTRACT)


solid = f1.part
